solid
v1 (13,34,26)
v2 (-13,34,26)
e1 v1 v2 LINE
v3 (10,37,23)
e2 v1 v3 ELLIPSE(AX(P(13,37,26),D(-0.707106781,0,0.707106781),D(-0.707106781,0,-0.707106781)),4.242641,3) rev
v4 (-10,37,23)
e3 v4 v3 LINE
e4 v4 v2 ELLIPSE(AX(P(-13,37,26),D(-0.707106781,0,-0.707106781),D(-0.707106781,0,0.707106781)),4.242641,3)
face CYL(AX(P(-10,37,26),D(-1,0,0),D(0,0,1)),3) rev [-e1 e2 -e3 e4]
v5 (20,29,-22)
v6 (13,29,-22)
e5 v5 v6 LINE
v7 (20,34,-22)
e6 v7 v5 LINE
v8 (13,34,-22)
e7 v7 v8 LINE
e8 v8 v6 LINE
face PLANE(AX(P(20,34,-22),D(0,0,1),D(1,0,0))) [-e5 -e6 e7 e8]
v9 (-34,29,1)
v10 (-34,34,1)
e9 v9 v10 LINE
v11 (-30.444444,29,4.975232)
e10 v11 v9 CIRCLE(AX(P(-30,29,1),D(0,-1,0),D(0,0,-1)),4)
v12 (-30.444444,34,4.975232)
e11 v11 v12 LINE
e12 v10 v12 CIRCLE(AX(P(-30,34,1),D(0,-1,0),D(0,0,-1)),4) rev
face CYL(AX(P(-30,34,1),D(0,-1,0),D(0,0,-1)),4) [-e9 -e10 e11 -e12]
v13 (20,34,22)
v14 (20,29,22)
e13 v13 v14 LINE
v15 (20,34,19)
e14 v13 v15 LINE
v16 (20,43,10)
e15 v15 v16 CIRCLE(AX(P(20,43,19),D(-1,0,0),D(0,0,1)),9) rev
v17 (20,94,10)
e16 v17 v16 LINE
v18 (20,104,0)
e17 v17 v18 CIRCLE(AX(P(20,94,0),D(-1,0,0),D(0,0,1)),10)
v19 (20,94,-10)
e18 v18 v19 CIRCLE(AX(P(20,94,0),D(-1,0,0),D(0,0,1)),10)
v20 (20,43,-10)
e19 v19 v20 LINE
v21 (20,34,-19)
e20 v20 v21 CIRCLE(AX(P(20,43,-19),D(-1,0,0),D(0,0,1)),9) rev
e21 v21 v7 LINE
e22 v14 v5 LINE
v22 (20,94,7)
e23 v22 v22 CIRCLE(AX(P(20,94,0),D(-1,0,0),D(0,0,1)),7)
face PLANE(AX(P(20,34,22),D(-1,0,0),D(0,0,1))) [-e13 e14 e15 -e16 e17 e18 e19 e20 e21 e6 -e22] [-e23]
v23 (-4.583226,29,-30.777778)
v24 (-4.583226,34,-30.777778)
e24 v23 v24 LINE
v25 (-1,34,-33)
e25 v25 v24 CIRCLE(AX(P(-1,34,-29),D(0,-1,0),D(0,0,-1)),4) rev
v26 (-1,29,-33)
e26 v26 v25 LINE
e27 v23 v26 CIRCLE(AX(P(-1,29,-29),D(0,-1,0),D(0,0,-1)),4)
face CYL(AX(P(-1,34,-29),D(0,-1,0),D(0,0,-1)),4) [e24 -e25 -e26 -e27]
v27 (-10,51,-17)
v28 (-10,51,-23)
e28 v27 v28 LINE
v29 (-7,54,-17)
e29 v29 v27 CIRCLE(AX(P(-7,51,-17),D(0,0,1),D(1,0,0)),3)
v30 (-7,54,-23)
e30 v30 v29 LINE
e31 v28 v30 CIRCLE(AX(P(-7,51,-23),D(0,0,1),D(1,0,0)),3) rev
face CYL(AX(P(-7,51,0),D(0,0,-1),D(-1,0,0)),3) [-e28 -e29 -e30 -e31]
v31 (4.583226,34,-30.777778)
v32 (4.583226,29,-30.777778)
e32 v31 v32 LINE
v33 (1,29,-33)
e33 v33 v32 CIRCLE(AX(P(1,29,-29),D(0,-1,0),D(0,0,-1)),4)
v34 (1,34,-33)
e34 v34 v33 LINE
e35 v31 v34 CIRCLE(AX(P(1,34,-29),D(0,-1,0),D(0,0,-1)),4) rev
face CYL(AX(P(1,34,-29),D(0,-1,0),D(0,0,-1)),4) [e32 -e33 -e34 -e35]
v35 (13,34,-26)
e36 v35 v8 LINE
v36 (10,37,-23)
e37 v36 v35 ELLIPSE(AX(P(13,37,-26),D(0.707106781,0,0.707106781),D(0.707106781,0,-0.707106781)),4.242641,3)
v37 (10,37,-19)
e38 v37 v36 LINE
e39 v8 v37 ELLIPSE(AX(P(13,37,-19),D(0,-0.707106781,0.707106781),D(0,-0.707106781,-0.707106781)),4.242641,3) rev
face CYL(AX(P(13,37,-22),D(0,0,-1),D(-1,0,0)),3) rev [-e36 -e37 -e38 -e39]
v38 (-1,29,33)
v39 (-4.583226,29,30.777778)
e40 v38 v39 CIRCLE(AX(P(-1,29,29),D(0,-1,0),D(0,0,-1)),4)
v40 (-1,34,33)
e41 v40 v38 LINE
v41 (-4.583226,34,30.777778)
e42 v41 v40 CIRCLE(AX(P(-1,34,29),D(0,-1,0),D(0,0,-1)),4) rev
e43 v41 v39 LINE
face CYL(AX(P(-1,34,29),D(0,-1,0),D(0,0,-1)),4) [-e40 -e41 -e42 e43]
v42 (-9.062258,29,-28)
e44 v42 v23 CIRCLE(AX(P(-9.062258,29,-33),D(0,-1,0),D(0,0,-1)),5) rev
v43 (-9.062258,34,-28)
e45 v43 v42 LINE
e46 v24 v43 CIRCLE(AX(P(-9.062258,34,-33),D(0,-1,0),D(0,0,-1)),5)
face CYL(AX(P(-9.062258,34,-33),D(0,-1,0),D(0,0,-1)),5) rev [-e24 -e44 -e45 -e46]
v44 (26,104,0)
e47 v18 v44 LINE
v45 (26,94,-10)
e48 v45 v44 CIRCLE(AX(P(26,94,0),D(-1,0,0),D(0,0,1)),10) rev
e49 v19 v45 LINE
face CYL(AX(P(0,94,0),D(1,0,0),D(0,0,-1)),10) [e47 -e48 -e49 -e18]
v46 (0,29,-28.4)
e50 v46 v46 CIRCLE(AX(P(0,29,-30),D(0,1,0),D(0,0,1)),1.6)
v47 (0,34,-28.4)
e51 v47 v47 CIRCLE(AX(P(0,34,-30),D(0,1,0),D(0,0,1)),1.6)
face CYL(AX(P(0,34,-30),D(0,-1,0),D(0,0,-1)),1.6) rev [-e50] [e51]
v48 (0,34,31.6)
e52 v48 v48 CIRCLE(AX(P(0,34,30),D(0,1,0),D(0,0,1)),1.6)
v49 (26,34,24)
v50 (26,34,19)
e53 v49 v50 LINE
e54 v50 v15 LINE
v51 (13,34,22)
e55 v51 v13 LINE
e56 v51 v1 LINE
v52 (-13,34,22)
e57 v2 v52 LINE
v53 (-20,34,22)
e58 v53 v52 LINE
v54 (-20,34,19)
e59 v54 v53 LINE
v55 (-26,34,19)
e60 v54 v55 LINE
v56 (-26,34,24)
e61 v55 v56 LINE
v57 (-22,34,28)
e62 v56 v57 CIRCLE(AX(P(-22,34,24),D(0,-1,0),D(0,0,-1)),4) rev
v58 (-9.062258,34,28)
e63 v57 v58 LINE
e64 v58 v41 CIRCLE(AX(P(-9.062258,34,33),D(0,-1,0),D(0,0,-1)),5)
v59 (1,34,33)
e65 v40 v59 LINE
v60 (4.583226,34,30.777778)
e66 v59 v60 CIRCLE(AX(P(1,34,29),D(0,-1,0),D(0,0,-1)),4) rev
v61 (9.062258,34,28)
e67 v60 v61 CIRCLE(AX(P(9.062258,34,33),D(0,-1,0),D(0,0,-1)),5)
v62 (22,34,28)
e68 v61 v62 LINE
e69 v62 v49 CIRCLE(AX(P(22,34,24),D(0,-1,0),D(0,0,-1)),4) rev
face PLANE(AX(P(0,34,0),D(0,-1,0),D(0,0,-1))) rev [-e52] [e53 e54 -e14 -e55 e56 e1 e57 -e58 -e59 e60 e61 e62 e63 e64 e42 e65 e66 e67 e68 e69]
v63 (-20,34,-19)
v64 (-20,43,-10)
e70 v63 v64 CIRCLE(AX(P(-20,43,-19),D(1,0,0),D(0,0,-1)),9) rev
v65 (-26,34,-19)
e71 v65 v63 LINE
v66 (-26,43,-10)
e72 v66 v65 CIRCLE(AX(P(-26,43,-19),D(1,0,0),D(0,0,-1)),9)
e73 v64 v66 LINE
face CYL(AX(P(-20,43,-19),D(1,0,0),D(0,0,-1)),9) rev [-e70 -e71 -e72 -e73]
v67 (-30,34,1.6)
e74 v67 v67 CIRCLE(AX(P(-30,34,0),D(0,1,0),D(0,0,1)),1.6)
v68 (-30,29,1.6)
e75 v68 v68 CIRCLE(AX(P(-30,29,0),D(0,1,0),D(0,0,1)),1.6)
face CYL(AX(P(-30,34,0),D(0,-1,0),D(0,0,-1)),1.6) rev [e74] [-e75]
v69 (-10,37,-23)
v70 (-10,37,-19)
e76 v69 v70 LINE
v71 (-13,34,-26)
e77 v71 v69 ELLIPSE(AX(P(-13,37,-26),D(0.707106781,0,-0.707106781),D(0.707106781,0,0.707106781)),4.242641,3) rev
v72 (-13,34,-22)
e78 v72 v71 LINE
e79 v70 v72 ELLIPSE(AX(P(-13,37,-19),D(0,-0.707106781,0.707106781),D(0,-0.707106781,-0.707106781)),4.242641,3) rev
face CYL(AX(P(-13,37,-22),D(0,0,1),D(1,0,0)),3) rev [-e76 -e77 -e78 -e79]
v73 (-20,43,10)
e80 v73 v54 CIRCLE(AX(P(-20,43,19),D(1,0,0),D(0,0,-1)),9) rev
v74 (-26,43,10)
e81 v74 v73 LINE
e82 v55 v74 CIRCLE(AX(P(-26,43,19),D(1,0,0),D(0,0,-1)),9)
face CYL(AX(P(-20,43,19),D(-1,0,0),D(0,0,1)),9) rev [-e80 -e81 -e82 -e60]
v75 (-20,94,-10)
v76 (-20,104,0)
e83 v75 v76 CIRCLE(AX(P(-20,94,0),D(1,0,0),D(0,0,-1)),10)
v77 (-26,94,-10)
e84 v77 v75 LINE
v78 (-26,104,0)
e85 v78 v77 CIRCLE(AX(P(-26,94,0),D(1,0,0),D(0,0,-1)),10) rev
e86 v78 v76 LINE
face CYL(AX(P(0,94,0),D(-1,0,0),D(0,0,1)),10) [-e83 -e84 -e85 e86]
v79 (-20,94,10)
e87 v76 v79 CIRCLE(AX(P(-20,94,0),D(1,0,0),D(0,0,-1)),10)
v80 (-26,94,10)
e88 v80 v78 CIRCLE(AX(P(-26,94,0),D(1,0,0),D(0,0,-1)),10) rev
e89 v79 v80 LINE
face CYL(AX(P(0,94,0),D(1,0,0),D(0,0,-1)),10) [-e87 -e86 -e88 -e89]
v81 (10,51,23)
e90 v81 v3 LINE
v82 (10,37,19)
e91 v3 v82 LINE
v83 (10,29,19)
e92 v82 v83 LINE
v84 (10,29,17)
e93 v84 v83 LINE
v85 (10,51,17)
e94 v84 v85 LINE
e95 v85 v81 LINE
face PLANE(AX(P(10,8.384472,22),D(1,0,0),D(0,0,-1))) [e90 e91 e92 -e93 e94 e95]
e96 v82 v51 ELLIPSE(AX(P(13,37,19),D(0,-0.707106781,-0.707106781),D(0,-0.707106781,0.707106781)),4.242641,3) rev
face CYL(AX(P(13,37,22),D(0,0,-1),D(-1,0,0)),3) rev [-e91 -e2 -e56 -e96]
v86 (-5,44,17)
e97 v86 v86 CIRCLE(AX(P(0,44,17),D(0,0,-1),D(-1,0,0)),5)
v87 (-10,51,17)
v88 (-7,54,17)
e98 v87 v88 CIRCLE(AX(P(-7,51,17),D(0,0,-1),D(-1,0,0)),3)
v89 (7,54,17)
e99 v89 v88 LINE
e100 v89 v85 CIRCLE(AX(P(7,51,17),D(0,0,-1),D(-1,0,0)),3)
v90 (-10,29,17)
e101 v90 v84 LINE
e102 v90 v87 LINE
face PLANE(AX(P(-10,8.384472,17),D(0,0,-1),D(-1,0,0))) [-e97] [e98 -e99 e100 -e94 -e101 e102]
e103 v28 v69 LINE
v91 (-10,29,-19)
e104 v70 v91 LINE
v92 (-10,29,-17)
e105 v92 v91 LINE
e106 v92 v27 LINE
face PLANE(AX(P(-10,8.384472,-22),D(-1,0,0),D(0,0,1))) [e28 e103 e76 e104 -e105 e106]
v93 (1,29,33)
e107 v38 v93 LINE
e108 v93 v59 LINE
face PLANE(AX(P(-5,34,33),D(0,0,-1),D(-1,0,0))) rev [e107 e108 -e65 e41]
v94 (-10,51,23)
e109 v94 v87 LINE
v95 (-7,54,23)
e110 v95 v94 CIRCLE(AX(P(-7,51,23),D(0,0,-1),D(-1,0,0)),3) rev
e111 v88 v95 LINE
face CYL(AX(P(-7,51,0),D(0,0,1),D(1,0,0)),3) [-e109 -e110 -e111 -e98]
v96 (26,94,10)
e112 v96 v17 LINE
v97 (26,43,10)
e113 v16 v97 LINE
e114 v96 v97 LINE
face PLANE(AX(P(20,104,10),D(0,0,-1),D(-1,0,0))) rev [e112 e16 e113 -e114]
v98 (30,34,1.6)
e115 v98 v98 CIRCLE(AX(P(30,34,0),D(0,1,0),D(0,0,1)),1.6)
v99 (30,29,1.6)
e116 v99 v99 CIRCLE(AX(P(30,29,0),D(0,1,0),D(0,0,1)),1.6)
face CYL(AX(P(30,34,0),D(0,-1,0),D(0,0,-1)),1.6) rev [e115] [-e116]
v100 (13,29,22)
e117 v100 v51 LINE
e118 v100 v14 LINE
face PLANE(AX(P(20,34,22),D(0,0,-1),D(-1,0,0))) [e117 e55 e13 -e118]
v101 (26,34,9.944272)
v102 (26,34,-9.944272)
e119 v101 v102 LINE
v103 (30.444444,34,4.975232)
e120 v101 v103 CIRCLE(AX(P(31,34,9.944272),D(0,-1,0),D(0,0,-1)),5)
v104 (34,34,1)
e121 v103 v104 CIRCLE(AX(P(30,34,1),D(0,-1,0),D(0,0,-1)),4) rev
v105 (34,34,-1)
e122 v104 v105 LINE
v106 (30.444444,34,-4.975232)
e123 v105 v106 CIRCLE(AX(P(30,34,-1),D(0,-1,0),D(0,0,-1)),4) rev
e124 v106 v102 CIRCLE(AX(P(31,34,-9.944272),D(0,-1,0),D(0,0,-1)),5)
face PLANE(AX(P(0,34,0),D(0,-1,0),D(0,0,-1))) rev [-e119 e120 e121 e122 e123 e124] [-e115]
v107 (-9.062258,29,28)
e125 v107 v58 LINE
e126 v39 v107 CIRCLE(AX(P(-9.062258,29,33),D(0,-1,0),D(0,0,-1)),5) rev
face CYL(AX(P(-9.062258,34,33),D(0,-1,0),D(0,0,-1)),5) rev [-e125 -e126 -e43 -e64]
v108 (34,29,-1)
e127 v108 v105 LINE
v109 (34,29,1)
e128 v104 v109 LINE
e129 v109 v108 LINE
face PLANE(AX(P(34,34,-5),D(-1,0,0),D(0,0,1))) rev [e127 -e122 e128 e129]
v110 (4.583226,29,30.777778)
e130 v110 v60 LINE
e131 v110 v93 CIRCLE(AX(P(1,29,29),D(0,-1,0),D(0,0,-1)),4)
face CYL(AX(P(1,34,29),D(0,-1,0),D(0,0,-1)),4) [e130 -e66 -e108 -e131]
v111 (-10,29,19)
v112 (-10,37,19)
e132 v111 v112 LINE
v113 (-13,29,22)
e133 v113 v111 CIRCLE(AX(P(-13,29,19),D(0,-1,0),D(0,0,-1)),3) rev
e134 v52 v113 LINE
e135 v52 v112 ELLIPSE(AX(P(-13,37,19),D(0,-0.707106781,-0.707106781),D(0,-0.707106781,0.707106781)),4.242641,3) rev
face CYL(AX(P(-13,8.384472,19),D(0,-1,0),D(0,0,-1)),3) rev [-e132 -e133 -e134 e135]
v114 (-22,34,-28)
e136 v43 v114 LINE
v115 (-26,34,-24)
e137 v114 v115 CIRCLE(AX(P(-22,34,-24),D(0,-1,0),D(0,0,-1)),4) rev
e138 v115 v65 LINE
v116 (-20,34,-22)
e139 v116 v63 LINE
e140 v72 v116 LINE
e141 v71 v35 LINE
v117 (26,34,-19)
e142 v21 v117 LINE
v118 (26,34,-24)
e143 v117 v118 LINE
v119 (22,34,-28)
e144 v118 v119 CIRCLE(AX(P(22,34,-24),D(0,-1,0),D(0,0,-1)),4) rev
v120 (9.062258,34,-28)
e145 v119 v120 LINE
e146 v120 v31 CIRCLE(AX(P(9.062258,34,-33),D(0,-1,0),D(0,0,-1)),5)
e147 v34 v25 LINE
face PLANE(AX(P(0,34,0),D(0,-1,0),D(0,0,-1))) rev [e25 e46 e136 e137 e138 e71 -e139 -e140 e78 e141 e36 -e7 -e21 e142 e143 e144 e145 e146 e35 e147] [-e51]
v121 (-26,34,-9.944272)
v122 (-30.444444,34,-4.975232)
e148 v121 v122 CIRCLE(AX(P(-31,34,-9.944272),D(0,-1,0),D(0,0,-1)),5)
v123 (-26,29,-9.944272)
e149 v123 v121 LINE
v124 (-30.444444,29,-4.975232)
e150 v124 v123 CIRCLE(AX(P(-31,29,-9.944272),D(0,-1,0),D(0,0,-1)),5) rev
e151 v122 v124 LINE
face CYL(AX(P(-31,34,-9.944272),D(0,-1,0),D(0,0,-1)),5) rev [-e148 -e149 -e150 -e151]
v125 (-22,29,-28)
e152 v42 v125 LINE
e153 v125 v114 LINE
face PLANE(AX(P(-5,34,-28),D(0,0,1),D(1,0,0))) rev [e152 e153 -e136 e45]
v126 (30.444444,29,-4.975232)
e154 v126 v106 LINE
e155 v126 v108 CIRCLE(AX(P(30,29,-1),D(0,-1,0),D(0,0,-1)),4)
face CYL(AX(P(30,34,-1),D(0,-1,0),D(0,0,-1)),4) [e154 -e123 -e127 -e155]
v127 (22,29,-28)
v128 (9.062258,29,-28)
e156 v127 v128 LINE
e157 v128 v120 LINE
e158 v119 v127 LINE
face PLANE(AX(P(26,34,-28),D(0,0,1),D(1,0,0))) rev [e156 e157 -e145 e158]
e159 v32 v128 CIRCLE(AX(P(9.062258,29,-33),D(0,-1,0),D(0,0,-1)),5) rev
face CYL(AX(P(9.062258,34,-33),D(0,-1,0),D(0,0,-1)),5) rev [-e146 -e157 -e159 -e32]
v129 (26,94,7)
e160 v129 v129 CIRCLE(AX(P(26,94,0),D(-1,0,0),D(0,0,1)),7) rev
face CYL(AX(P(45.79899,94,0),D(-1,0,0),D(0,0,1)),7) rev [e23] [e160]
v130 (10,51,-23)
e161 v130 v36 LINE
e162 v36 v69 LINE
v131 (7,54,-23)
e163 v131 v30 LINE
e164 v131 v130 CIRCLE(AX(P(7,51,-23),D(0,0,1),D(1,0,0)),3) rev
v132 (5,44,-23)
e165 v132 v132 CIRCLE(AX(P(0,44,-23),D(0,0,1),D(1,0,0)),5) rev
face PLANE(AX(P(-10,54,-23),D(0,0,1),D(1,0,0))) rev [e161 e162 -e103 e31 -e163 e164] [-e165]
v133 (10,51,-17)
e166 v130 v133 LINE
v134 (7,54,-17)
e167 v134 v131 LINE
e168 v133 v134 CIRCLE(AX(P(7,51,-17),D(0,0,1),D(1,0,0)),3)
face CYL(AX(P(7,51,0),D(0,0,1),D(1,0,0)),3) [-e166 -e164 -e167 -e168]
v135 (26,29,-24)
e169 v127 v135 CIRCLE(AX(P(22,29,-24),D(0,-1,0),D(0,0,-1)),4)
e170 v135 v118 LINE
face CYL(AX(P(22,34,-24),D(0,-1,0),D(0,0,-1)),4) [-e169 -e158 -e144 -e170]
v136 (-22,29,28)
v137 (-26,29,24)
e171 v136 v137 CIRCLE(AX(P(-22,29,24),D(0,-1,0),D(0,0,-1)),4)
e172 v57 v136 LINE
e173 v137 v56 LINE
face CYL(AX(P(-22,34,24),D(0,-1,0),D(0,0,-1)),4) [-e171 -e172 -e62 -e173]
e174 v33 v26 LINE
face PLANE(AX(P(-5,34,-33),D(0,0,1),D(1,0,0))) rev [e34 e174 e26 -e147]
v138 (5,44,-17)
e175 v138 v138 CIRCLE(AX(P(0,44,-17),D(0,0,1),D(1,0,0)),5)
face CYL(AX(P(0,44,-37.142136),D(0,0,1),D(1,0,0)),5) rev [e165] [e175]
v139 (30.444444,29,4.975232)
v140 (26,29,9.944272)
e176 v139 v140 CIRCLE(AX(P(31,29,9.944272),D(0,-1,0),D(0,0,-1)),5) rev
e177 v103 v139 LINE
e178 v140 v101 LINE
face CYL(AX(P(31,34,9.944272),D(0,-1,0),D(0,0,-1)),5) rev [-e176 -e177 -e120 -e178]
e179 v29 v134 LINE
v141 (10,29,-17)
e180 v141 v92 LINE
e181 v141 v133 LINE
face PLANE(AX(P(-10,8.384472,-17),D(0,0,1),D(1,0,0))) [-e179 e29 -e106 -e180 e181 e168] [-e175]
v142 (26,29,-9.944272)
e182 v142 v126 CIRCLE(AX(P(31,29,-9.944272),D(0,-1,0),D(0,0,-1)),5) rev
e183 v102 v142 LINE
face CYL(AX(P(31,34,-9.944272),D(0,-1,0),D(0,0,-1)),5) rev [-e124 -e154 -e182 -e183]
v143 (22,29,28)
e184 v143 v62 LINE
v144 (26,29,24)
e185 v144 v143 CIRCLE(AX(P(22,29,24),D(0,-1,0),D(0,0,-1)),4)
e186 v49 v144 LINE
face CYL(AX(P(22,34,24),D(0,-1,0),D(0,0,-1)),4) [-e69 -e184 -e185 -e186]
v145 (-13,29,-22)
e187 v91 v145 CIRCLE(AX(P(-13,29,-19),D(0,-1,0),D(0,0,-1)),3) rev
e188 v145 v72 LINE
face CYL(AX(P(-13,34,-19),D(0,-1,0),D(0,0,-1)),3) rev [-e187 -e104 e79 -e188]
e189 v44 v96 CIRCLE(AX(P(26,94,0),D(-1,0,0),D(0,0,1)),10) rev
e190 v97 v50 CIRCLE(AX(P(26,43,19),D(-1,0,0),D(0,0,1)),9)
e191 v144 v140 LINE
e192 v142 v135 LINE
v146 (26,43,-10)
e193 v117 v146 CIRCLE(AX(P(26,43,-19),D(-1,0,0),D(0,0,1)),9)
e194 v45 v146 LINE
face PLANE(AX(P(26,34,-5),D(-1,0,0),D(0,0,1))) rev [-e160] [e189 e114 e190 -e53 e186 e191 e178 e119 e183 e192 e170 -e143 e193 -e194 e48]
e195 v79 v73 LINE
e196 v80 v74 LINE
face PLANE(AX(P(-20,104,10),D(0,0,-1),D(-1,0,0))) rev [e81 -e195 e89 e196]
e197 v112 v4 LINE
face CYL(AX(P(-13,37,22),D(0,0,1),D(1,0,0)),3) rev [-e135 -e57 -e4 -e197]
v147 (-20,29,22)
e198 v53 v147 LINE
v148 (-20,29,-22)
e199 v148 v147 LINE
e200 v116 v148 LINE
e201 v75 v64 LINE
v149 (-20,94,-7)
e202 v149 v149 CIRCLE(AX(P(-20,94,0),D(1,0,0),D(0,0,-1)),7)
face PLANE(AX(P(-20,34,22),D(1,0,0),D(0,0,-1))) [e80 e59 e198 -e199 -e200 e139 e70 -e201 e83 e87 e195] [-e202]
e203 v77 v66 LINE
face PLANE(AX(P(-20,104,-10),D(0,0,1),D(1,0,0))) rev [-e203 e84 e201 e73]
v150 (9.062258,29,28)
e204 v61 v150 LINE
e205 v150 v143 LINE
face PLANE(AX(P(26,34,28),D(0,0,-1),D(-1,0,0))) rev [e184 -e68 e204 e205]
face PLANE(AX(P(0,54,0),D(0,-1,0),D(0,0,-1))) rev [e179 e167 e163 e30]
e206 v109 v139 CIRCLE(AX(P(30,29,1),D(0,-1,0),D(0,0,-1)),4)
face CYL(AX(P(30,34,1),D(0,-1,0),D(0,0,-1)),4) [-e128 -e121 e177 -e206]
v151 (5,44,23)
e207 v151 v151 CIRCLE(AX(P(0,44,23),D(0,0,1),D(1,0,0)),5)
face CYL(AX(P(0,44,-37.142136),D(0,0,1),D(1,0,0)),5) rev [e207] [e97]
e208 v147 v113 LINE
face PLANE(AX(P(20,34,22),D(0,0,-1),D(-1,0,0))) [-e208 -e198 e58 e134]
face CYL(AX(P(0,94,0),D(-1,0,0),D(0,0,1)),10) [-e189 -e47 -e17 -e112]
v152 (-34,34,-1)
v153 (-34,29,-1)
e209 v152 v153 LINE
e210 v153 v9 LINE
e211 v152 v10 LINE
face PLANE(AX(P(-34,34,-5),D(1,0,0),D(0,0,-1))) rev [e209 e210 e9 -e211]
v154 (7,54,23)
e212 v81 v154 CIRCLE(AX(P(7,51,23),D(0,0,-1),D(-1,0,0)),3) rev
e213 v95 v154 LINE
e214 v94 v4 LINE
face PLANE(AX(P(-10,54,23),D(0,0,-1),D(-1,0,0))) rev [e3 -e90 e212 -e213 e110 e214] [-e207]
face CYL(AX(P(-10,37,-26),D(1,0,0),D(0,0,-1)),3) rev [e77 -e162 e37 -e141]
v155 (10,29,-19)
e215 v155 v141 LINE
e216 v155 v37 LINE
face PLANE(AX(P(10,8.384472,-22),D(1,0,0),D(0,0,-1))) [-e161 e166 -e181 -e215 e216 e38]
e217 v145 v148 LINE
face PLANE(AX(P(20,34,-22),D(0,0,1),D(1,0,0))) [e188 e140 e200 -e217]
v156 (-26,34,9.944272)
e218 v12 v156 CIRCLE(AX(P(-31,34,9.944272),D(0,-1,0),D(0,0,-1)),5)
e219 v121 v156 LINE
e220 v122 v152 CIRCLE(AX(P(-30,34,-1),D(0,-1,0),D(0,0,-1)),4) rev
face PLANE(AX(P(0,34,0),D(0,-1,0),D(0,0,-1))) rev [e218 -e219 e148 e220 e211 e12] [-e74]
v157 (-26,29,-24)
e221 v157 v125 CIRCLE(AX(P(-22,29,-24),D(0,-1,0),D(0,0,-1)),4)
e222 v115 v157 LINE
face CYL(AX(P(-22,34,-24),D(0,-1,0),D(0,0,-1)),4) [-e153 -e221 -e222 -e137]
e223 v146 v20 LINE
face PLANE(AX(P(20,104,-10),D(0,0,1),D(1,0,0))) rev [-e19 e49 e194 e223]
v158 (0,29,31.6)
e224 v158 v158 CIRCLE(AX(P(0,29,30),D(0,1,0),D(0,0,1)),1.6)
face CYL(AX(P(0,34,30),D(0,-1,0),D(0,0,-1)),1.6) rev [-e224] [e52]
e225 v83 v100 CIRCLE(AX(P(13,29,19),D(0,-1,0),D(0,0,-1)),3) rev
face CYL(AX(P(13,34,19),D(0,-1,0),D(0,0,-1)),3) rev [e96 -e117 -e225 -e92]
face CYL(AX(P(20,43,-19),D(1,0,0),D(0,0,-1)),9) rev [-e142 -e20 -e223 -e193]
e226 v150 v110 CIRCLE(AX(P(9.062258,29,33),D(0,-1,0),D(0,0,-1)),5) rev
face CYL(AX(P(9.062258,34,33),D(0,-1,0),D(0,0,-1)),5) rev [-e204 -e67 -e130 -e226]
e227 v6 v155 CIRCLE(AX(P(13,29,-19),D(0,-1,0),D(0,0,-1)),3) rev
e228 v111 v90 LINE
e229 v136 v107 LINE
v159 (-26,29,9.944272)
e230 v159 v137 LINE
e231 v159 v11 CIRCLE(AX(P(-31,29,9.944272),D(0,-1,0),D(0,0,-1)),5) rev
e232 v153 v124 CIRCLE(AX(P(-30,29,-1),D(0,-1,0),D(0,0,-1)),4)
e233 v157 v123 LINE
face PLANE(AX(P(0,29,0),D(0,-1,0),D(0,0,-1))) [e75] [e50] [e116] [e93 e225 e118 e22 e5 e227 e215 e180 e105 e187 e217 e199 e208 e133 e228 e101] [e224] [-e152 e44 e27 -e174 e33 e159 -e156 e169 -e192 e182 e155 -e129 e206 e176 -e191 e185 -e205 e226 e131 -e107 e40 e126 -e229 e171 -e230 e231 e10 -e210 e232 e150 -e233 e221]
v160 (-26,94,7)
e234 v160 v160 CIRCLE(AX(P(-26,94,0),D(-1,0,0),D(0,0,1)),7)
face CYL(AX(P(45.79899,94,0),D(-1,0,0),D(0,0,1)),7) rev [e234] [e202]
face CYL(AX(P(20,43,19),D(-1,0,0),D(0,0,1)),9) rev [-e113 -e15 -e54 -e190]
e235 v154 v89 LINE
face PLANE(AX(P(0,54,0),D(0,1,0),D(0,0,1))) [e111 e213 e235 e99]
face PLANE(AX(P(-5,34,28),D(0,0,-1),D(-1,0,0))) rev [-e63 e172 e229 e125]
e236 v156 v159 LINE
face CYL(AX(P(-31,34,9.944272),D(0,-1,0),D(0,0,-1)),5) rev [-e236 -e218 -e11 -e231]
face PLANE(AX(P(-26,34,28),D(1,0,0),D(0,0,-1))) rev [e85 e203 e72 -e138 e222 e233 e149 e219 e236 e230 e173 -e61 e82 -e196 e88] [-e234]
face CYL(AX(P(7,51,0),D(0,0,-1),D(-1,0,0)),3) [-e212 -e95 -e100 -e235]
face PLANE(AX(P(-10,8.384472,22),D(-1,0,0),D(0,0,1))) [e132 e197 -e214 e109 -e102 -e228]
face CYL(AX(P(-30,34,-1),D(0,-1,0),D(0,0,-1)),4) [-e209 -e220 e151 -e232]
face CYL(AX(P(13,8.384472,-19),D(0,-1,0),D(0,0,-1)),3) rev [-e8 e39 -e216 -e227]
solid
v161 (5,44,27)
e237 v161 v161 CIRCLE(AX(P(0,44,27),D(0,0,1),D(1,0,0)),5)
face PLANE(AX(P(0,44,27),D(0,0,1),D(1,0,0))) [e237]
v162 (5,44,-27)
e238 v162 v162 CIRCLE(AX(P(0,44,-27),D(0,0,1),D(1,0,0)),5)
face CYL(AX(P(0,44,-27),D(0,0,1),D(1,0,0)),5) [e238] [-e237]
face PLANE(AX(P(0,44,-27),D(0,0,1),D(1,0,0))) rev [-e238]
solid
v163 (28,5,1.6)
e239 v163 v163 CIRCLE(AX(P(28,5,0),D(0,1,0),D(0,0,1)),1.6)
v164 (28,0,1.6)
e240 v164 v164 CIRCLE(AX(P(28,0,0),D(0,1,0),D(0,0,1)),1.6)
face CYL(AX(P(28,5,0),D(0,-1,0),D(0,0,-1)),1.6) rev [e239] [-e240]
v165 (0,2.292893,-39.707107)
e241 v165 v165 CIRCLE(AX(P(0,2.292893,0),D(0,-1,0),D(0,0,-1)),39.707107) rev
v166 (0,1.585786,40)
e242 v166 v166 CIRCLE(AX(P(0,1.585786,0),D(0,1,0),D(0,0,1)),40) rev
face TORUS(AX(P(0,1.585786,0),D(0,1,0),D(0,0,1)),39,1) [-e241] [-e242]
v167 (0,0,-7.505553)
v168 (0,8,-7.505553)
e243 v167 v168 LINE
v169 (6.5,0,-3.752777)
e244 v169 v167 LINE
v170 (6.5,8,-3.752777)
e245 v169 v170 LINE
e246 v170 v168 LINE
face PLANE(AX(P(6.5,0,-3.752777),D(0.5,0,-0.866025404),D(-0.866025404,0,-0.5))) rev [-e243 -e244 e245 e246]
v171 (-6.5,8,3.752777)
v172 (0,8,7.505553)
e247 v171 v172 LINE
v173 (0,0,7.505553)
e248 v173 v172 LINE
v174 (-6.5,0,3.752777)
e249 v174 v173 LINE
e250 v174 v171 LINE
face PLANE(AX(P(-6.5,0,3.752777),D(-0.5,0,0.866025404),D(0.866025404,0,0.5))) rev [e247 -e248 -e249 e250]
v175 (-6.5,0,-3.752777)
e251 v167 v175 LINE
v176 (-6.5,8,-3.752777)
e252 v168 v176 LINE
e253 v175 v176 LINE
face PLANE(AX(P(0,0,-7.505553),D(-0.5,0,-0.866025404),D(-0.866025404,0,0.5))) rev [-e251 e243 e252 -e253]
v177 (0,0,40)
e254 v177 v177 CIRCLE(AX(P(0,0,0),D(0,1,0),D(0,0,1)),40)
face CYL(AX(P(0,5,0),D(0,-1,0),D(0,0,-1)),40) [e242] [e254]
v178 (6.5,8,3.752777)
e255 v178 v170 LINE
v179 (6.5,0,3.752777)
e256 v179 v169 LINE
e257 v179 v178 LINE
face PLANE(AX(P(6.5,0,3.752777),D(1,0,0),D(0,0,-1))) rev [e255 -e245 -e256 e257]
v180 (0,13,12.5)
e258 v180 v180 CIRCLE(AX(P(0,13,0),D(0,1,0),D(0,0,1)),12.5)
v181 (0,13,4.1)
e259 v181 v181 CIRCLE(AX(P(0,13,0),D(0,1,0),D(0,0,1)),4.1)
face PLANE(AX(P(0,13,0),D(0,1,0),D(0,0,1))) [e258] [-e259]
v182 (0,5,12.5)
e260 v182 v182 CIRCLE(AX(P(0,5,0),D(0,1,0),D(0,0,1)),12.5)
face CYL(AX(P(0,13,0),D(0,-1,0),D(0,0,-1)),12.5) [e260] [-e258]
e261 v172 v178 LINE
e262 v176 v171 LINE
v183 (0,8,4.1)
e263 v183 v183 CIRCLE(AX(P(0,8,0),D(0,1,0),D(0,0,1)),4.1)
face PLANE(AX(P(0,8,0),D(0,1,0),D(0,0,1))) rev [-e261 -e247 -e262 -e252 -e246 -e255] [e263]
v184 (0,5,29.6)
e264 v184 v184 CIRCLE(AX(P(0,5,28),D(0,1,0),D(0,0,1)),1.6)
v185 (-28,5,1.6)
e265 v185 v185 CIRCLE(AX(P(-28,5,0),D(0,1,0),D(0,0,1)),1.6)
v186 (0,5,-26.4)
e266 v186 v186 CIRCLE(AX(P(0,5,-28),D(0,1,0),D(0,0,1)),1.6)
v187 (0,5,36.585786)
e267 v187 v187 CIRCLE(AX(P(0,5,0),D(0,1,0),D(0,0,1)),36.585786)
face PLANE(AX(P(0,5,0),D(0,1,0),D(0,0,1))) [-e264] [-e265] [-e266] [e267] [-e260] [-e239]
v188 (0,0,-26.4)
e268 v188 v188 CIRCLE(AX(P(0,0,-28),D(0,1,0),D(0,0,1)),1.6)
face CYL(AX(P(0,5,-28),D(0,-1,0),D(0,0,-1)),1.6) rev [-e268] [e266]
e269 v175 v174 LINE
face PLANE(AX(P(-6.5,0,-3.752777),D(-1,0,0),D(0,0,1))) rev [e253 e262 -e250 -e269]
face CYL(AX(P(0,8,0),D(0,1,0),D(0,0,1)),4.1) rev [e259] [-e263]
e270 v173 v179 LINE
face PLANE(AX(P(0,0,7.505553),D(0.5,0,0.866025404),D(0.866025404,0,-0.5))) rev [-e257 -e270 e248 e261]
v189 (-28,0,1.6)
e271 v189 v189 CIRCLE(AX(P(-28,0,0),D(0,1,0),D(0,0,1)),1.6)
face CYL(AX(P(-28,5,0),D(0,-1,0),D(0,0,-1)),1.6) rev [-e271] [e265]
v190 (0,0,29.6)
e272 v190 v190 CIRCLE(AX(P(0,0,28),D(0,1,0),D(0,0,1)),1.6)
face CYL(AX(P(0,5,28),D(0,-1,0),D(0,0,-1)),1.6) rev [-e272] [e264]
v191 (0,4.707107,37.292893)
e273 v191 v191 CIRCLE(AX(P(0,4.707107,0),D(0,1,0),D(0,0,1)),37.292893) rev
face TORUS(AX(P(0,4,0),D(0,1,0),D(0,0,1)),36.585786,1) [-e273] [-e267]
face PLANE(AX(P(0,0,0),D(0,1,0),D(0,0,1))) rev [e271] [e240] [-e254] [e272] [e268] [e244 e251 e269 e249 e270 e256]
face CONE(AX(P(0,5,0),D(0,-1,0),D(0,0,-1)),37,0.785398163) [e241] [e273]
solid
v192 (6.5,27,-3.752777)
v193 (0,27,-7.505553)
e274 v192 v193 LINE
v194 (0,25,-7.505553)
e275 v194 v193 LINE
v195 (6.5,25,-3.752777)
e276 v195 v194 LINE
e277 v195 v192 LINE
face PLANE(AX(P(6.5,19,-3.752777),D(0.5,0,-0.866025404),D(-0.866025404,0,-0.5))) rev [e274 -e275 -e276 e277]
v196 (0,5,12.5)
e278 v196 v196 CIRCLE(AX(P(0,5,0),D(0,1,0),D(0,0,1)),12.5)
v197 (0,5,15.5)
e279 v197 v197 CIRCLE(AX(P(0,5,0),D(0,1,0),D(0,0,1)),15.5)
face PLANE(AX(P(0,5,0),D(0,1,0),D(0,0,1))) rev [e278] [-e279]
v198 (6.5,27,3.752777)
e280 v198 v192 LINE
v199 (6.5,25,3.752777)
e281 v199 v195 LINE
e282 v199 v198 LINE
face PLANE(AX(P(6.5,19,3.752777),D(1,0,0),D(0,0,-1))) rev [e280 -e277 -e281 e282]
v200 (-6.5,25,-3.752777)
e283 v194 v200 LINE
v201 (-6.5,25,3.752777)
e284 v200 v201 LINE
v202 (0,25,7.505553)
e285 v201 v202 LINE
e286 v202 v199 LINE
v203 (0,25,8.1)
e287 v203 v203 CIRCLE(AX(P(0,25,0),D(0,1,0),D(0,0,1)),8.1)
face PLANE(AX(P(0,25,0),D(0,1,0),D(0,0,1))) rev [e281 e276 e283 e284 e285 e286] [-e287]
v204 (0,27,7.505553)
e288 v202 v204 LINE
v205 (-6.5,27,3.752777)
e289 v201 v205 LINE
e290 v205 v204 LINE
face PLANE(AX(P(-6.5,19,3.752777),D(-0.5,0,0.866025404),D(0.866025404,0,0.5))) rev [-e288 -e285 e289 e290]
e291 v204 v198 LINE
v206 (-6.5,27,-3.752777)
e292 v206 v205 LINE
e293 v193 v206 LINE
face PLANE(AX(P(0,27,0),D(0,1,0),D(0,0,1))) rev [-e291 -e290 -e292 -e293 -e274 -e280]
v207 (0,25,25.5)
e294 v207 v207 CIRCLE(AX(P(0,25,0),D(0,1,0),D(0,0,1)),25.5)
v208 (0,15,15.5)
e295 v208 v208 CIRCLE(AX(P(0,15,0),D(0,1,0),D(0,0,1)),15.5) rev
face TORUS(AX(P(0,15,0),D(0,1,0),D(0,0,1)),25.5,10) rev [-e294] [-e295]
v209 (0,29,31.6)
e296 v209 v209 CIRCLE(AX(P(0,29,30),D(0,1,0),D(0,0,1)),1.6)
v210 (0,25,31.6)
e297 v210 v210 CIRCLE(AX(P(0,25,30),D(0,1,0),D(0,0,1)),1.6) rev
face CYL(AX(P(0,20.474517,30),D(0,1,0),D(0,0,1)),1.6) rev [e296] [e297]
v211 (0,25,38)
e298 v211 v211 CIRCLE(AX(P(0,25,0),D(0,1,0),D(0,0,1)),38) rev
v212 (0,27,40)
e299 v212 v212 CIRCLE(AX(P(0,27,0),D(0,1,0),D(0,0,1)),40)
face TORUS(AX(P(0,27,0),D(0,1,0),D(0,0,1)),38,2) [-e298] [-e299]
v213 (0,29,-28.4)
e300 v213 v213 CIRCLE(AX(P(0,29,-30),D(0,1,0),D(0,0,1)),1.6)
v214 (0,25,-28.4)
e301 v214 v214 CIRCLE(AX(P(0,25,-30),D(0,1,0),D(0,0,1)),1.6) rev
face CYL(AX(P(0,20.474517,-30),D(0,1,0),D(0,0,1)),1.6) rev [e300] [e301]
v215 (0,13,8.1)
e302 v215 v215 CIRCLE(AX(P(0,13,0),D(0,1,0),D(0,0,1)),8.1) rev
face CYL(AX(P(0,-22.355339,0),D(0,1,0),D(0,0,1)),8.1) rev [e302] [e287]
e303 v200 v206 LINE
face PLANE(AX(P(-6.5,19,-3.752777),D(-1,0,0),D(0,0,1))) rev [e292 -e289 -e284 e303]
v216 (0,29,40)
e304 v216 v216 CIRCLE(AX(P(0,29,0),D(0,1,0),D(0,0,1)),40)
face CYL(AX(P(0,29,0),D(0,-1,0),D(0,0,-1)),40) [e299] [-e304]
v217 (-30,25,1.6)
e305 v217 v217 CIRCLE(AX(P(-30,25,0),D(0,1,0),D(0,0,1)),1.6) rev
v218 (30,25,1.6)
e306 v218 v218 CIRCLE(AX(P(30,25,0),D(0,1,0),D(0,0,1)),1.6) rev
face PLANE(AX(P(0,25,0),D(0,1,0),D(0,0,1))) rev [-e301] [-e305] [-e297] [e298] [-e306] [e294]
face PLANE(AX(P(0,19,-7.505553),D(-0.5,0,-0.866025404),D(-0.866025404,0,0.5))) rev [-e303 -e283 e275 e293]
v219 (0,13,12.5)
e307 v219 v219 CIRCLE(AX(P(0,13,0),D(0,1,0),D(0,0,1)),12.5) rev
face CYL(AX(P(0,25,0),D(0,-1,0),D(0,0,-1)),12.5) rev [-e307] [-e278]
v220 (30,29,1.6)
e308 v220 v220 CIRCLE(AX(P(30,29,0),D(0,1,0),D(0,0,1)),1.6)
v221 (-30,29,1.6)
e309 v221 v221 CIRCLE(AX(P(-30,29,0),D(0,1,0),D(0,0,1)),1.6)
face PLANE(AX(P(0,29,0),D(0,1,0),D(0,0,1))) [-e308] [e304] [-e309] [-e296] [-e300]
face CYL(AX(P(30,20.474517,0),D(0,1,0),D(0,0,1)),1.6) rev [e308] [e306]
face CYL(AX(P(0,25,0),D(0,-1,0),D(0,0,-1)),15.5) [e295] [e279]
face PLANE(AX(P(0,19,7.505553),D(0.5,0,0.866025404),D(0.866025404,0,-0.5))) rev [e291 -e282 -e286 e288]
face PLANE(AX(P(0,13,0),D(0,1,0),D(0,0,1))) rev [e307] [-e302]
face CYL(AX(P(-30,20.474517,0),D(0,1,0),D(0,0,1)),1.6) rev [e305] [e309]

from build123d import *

# Parameters (mm, degrees)
CROQUIS1_R               = 40
CROQUIS1_R_2             = 1.6
SALIENTE_EXTRUIR1_DEPTH  = 5
CHAFL_N1_SIZE            = 3
REDONDEO1_R              = 1
CORTAR_EXTRUIR1_DEPTH    = 5
SALIENTE_EXTRUIR3_DEPTH  = 8
CROQUIS6_R               = 4.1
SALIENTE_EXTRUIR4_DEPTH  = 5
CROQUIS7_R               = 12.5
SALIENTE_EXTRUIR5_DEPTH  = 8
CROQUIS9_R               = 15.5
CROQUIS9_R_2             = 12.5
SALIENTE_EXTRUIR7_DEPTH  = 20
SALIENTE_EXTRUIR8_START  = -12
CROQUIS10_R              = 12.5
CROQUIS10_R_2            = 8.1
SALIENTE_EXTRUIR8_DEPTH  = 12
CROQUIS11_R              = 40
SALIENTE_EXTRUIR9_DEPTH  = 4
REDONDEO2_R              = 10
CORTAR_EXTRUIR2_DEPTH    = 10
SALIENTE_EXTRUIR10_DEPTH = 2
REDONDEO3_R              = 2
CROQUIS14_R              = 1.6
CORTAR_EXTRUIR3_DEPTH    = 4
CROQUIS15_R              = 1.6
CROQUIS15_W              = 40
CROQUIS15_H              = 44
SALIENTE_EXTRUIR11_DEPTH = 5
REDONDEO4_R              = 4
CROQUIS16_W              = 6
CROQUIS16_H              = 20
SALIENTE_EXTRUIR12_DEPTH = 70
REDONDEO5_R              = 10
CORTAR_EXTRUIR4_REACH    = 131.507
CROQUIS18_R              = 7
REDONDEO6_R              = 9
REDONDEO7_R              = 5
CROQUIS19_W              = 20
CROQUIS19_H              = 5
SALIENTE_EXTRUIR13_DEPTH = 5
CROQUIS20_W              = 20
CROQUIS20_H              = 6
SALIENTE_EXTRUIR14_DEPTH = 20
CORTAR_EXTRUIR5_REACH    = 130.004
CROQUIS21_R              = 5
REDONDEO9_R              = 3
REDONDEO10_R             = 3
CROQUIS22_R              = 5
SALIENTE_EXTRUIR15_DEPTH = 50
CROQUIS23_R              = 5
SALIENTE_EXTRUIR16_DEPTH = 4


# Some blends are built 0.0001 mm under size
with BuildPart() as part:
    # Croquis1 → Saliente-Extruir1 (new body)
    with BuildSketch(Plane(origin=(0, 0, 0), x_dir=(1, 0, 0), z_dir=(0, 1, 0))):
        with Locations(Location((0, 0, 0), (0, 0, 270))):
            Circle(CROQUIS1_R)
        with Locations(Location((0, 28, 0), (0, 0, 270))):
            Circle(CROQUIS1_R_2, mode=Mode.SUBTRACT)
        with Locations(Location((28, 0, 0), (0, 0, 270))):
            Circle(CROQUIS1_R_2, mode=Mode.SUBTRACT)
        with Locations(Location((0, -28, 0), (0, 0, 270))):
            Circle(CROQUIS1_R_2, mode=Mode.SUBTRACT)
        with Locations(Location((-28, 0, 0), (0, 0, 270))):
            Circle(CROQUIS1_R_2, mode=Mode.SUBTRACT)
    extrude(amount=SALIENTE_EXTRUIR1_DEPTH)

    # Chaflán1
    chafl_n1_edges = [part.edges().sort_by_distance(p)[0] for p in [
        (0, 5, -40),
    ]]
    chamfer(chafl_n1_edges, length=CHAFL_N1_SIZE)

    # Redondeo1
    redondeo1_edges = [part.edges().sort_by_distance(p)[0] for p in [
        (0, 5, -37),
        (0, 2, -40),
    ]]
    fillet(redondeo1_edges, radius=REDONDEO1_R)

    # Croquis4 → Cortar-Extruir1 (cut)
    with BuildSketch(Plane(origin=(0, 5, 0), x_dir=(1, 0, 0), z_dir=(0, 1, 0))):
        Polygon((0, 7.505553499), (-6.5, 3.75277675), (-6.5, -3.75277675), (0, -7.505553499), (6.5, -3.75277675), (6.5, 3.75277675), align=None)
    extrude(amount=-CORTAR_EXTRUIR1_DEPTH, mode=Mode.SUBTRACT)

    # Croquis5 → Saliente-Extruir3 (add)
    with BuildSketch(Plane(origin=(0, 5, 0), x_dir=(1, 0, 0), z_dir=(0, 1, 0))):
        Polygon((0, 10.969655115), (-9.5, 5.484827557), (-9.5, -5.484827557), (0, -10.969655115), (9.5, -5.484827557), (9.5, 5.484827557), align=None)
        Polygon((0, 7.505553499), (-6.5, 3.75277675), (-6.5, -3.75277675), (0, -7.505553499), (6.5, -3.75277675), (6.5, 3.75277675), align=None, mode=Mode.SUBTRACT)
    extrude(amount=SALIENTE_EXTRUIR3_DEPTH)

    # Croquis6 → Saliente-Extruir4 (add)
    with BuildSketch(Plane(origin=(0, 13, 0), x_dir=(1, 0, 0), z_dir=(0, 1, 0))):
        Polygon((0, 7.505553499), (-6.5, 3.75277675), (-6.5, -3.75277675), (0, -7.505553499), (6.5, -3.75277675), (6.5, 3.75277675), align=None)
        with Locations(Location((0, 0, 0), (0, 0, 270))):
            Circle(CROQUIS6_R, mode=Mode.SUBTRACT)
    extrude(amount=-SALIENTE_EXTRUIR4_DEPTH)

    # Croquis7 → Saliente-Extruir5 (add)
    with BuildSketch(Plane(origin=(0, 5, 0), x_dir=(1, 0, 0), z_dir=(0, 1, 0))):
        with Locations(Location((0, 0, 0), (0, 0, 270))):
            Circle(CROQUIS7_R)
        Polygon((9.5, 5.484827557), (0, 10.969655115), (-9.5, 5.484827557), (-9.5, -5.484827557), (0, -10.969655115), (9.5, -5.484827557), align=None, mode=Mode.SUBTRACT)
    extrude(amount=SALIENTE_EXTRUIR5_DEPTH)


with BuildPart() as body_2:
    # Croquis9 → Saliente-Extruir7 (new body)
    with BuildSketch(Plane(origin=(0, 5, 0), x_dir=(1, 0, 0), z_dir=(0, 1, 0))):
        with Locations(Location((0, 0, 0), (0, 0, 270))):
            Circle(CROQUIS9_R)
        with Locations(Location((0, 0, 0), (0, 0, 270))):
            Circle(CROQUIS9_R_2, mode=Mode.SUBTRACT)
    extrude(amount=SALIENTE_EXTRUIR7_DEPTH)

    # Croquis10 → Saliente-Extruir8 (add)
    with BuildSketch(Plane(origin=(0, 25, 0), x_dir=(1, 0, 0), z_dir=(0, 1, 0)).offset(SALIENTE_EXTRUIR8_START)):
        with Locations(Location((0, 0, 0), (0, 0, 270))):
            Circle(CROQUIS10_R)
        with Locations(Location((0, 0, 0), (0, 0, 270))):
            Circle(CROQUIS10_R_2, mode=Mode.SUBTRACT)
    extrude(amount=SALIENTE_EXTRUIR8_DEPTH)

    # Croquis11 → Saliente-Extruir9 (add)
    with BuildSketch(Plane(origin=(0, 25, 0), x_dir=(1, 0, 0), z_dir=(0, 1, 0))):
        with Locations(Location((0, 0, 0), (0, 0, 270))):
            Circle(CROQUIS11_R)
    extrude(amount=SALIENTE_EXTRUIR9_DEPTH)

    # Redondeo2
    redondeo2_edges = [body_2.edges().sort_by_distance(p)[0] for p in [
        (0, 25, -15.5),
    ]]
    fillet(redondeo2_edges, radius=REDONDEO2_R)

    # Croquis12 → Cortar-Extruir2 (cut)
    with BuildSketch(Plane(origin=(0, 29, 0), x_dir=(1, 0, 0), z_dir=(0, 1, 0))):
        Polygon((0, 7.505553499), (-6.5, 3.75277675), (-6.5, -3.75277675), (0, -7.505553499), (6.5, -3.75277675), (6.5, 3.75277675), align=None)
    extrude(amount=-CORTAR_EXTRUIR2_DEPTH, mode=Mode.SUBTRACT)

    # Croquis13 → Saliente-Extruir10 (add)
    with BuildSketch(Plane(origin=(0, 29, 0), x_dir=(1, 0, 0), z_dir=(0, 1, 0))):
        Polygon((-6.5, 3.75277675), (-6.5, -3.75277675), (0, -7.505553499), (6.5, -3.75277675), (6.5, 3.75277675), (0, 7.505553499), align=None)
    extrude(amount=-SALIENTE_EXTRUIR10_DEPTH)

    # Redondeo3
    redondeo3_edges = [body_2.edges().sort_by_distance(p)[0] for p in [
        (0, 25, -40),
    ]]
    fillet(redondeo3_edges, radius=REDONDEO3_R)

    # Croquis14 → Cortar-Extruir3 (cut)
    with BuildSketch(Plane(origin=(0, 29, 0), x_dir=(1, 0, 0), z_dir=(0, 1, 0))):
        with Locations(Location((0, 30, 0), (0, 0, 270))):
            Circle(CROQUIS14_R)
        with Locations(Location((30, 0, 0), (0, 0, 270))):
            Circle(CROQUIS14_R)
        with Locations(Location((0, -30, 0), (0, 0, 270))):
            Circle(CROQUIS14_R)
        with Locations(Location((-30, 0, 0), (0, 0, 270))):
            Circle(CROQUIS14_R)
    extrude(amount=-CORTAR_EXTRUIR3_DEPTH, mode=Mode.SUBTRACT)


with BuildPart() as body_3:
    # Croquis15 → Saliente-Extruir11 (new body)
    with BuildSketch(Plane(origin=(0, 29, 0), x_dir=(1, 0, 0), z_dir=(0, 1, 0))):
        Polygon((26, -28), (5, -28), (5, -33), (-5, -33), (-5, -28), (-26, -28), (-26, -5), (-34, -5), (-34, 5), (-26, 5), (-26, 28), (-5, 28), (-5, 33), (5, 33), (5, 28), (26, 28), (26, 5), (34, 5), (34, -5), (26, -5), align=None)
        with Locations(Location((0, -30, 0), (0, 0, 270))):
            Circle(CROQUIS15_R, mode=Mode.SUBTRACT)
        with Locations(Location((30, 0, 0), (0, 0, 270))):
            Circle(CROQUIS15_R, mode=Mode.SUBTRACT)
        with Locations(Location((0, 30, 0), (0, 0, 270))):
            Circle(CROQUIS15_R, mode=Mode.SUBTRACT)
        with Locations(Location((-30, 0, 0), (0, 0, 270))):
            Circle(CROQUIS15_R, mode=Mode.SUBTRACT)
        Rectangle(CROQUIS15_W, CROQUIS15_H, mode=Mode.SUBTRACT)
    extrude(amount=SALIENTE_EXTRUIR11_DEPTH)

    # Redondeo4
    redondeo4_edges = [body_3.edges().sort_by_distance(p)[0] for p in [
        (-5, 31.5, -33),
        (5, 31.5, -33),
        (26, 31.5, -28),
        (34, 31.5, -5),
        (34, 31.5, 5),
        (26, 31.5, 28),
        (5, 31.5, 33),
        (-5, 31.5, 33),
        (-26, 31.5, 28),
        (-34, 31.5, 5),
        (-34, 31.5, -5),
        (-26, 31.5, -28),
    ]]
    fillet(redondeo4_edges, radius=REDONDEO4_R)

    # Croquis16 → Saliente-Extruir12 (add)
    with BuildSketch(Plane(origin=(0, 34, 0), x_dir=(1, 0, 0), z_dir=(0, 1, 0))):
        with Locations((-23, 0)):
            Rectangle(CROQUIS16_W, CROQUIS16_H)
        with Locations((23, 0)):
            Rectangle(CROQUIS16_W, CROQUIS16_H)
    extrude(amount=SALIENTE_EXTRUIR12_DEPTH)

    # Redondeo5
    redondeo5_edges = [body_3.edges().sort_by_distance(p)[0] for p in [
        (23, 104, -10),
        (23, 104, 10),
        (-23, 104, -10),
        (-23, 104, 10),
    ]]
    fillet(redondeo5_edges, radius=REDONDEO5_R - 0.0001)  # a hair under: the kernel refuses the full size

    # Cortar-Extruir4: up to this face of the body (flat: up to its plane)
    cortar_extruir4_end = Plane(body_3.part.faces().sort_by_distance((26, 63.485538795, 0))[0])
    # Croquis18 → Cortar-Extruir4 (cut, up to the picked face)
    with BuildSketch(Plane.ZY.offset(26), mode=Mode.PRIVATE) as cortar_extruir4_sk1:
        with Locations((0, 94)):
            Circle(CROQUIS18_R)
    cortar_extruir4_tool1 = split(extrude(cortar_extruir4_sk1.sketch, amount=-CORTAR_EXTRUIR4_REACH, mode=Mode.PRIVATE), bisect_by=cortar_extruir4_end, keep=Keep.BOTH, mode=Mode.PRIVATE)
    add(cortar_extruir4_tool1.solids().sort_by(Axis((-26, 94, 0), (1, 0, 0)))[0], mode=Mode.SUBTRACT)

    # Redondeo6
    redondeo6_edges = [body_3.edges().sort_by_distance(p)[0] for p in [
        (-23, 34, -10),
        (-23, 34, 10),
        (23, 34, 10),
        (23, 34, -10),
    ]]
    fillet(redondeo6_edges, radius=REDONDEO6_R)

    # Redondeo7
    # the kernel refuses this fillet: 5 mm, written as the material it adds along each edge
    with BuildSketch(Plane(origin=(5, 29, -28), x_dir=(1, 0, 0), z_dir=(0, 1, 0))) as redondeo7_piece_1:
        with BuildLine():
            CenterArc((4.062257748, 5), REDONDEO7_R, 206.387799961, 63.612200039)
            Line((-0.416774334, 2.777777778), (-0.864677542, 2.555555556))
            ThreePointArc((-0.864677542, 2.555555556), (-0.5, 1), (-0.5, 0))
            Line((-0.5, 0), (0, -0.5))
            Line((0, -0.5), (4.062257748, -0.5))
            Line((4.062257748, -0.5), (4.062257748, 0))
        make_face()
    extrude(amount=5)
    with BuildSketch(Plane(origin=(-5, 29, -28), x_dir=(0.14837794057356674, 0, -0.9889307289952856), z_dir=(0, 1, 0))) as redondeo7_piece_2:
        with BuildLine():
            CenterArc((4.341904206, 4.759181219), REDONDEO7_R, 188.532937529, 63.612200039)
            Line((-0.602749439, 4.017291516), (-1.097214803, 3.943102546))
            Line((-1.097214803, 3.943102546), (-0.494465364, -0.07418897))
            Line((-0.494465364, -0.07418897), (0.07418897, -0.494465364))
            ThreePointArc((0.07418897, -0.494465364), (1.063119699, -0.346087424), (2.655566492, -0.475918122))
            Line((2.655566492, -0.475918122), (2.80886992, 0))
        make_face()
    extrude(amount=5)
    with BuildSketch(Plane(origin=(-26, 29, -5), x_dir=(0, 0, -1), z_dir=(0, 1, 0)), Plane(origin=(26, 29, 5), x_dir=(0, 0, 1), z_dir=(0, 1, 0))) as redondeo7_piece_3:
        with BuildLine():
            CenterArc((4.94427191, 5), REDONDEO7_R, 186.379370208, 83.620629792)
            Line((-0.02476804, 4.444444444), (-0.521672035, 4.388888889))
            ThreePointArc((-0.521672035, 4.388888889), (-0.5, 4), (-0.5, 0))
            Line((-0.5, 0), (0, -0.5))
            Line((0, -0.5), (4.94427191, -0.5))
            Line((4.94427191, -0.5), (4.94427191, 0))
        make_face()
    extrude(amount=5)
    with BuildSketch(Plane(origin=(-26, 29, 5), x_dir=(0, 0, 1), z_dir=(0, 1, 0)), Plane(origin=(26, 29, -5), x_dir=(0, 0, -1), z_dir=(0, 1, 0))) as redondeo7_piece_4:
        with BuildLine():
            CenterArc((4.94427191, -5), REDONDEO7_R, 90, 83.620629792)
            Line((-0.02476804, -4.444444444), (-0.521672035, -4.388888889))
            ThreePointArc((-0.521672035, -4.388888889), (-0.5, -4), (-0.5, 0))
            Line((-0.5, 0), (0, 0.5))
            Line((0, 0.5), (4.94427191, 0.5))
            Line((4.94427191, 0.5), (4.94427191, 0))
        make_face()
    extrude(amount=5)
    with BuildSketch(Plane(origin=(-5, 29, 28), x_dir=(0.14837794057356815, 0, 0.9889307289952854), z_dir=(0, 1, 0))) as redondeo7_piece_5:
        with BuildLine():
            CenterArc((4.341904206, -4.759181219), REDONDEO7_R, 107.854862432, 63.612200039)
            Line((-0.602749439, -4.017291516), (-1.097214803, -3.943102546))
            Line((-1.097214803, -3.943102546), (-0.494465364, 0.07418897))
            Line((-0.494465364, 0.07418897), (0.07418897, 0.494465364))
            ThreePointArc((0.07418897, 0.494465364), (1.063119699, 0.346087424), (2.655566492, 0.475918122))
            Line((2.655566492, 0.475918122), (2.80886992, 0))
        make_face()
    extrude(amount=5)
    with BuildSketch(Plane(origin=(5, 29, 28), x_dir=(1, 0, 0), z_dir=(0, 1, 0))) as redondeo7_piece_6:
        with BuildLine():
            CenterArc((4.062257748, -5), REDONDEO7_R, 90, 63.612200039)
            Line((-0.416774334, -2.777777778), (-0.864677542, -2.555555556))
            ThreePointArc((-0.864677542, -2.555555556), (-0.5, -1), (-0.5, 0))
            Line((-0.5, 0), (0, 0.5))
            Line((0, 0.5), (4.062257748, 0.5))
            Line((4.062257748, 0.5), (4.062257748, 0))
        make_face()
    extrude(amount=5)

    # Croquis19 → Saliente-Extruir13 (add)
    with BuildSketch(Plane(origin=(0, 34, 0), x_dir=(1, 0, 0), z_dir=(0, 1, 0))):
        with Locations((0, -19.5)):
            Rectangle(CROQUIS19_W, CROQUIS19_H)
        with Locations((0, 19.5)):
            Rectangle(CROQUIS19_W, CROQUIS19_H)
    extrude(amount=-SALIENTE_EXTRUIR13_DEPTH)

    # Croquis20 → Saliente-Extruir14 (add)
    with BuildSketch(Plane(origin=(0, 34, 0), x_dir=(1, 0, 0), z_dir=(0, 1, 0))):
        with Locations((0, 20)):
            Rectangle(CROQUIS20_W, CROQUIS20_H)
        with Locations((0, -20)):
            Rectangle(CROQUIS20_W, CROQUIS20_H)
    extrude(amount=SALIENTE_EXTRUIR14_DEPTH)

    # Cortar-Extruir5: up to this face of the body (flat: up to its plane)
    cortar_extruir5_end = Plane(body_3.part.faces().sort_by_distance((0, 44, -23))[0])
    # Croquis21 → Cortar-Extruir5 (cut, up to the picked face)
    with BuildSketch(Plane.XY.offset(23), mode=Mode.PRIVATE) as cortar_extruir5_sk1:
        with Locations((0, 44)):
            Circle(CROQUIS21_R)
    cortar_extruir5_tool1 = split(extrude(cortar_extruir5_sk1.sketch, amount=-CORTAR_EXTRUIR5_REACH, mode=Mode.PRIVATE), bisect_by=cortar_extruir5_end, keep=Keep.BOTH, mode=Mode.PRIVATE)
    add(cortar_extruir5_tool1.solids().sort_by(Axis((0, 44, 23), (0, 0, -1)))[0], mode=Mode.SUBTRACT)

    # Redondeo9
    redondeo9_edges = [body_3.edges().sort_by_distance(p)[0] for p in [
        (-10, 31.5, 22),
        (10, 31.5, 22),
        (-10, 31.5, -22),
        (10, 31.5, -22),
        (0, 34, -23),
        (-10, 54, -20),
        (10, 54, -20),
        (0, 34, 23),
        (-10, 54, 20),
        (10, 54, 20),
    ]]
    fillet(redondeo9_edges, radius=REDONDEO9_R)

    # Redondeo10
    redondeo10_edges = [body_3.edges().sort_by_distance(p)[0] for p in [
        (-10, 34, 22.5),
        (10, 34, 22.5),
        (-10, 34, -22.5),
        (10, 34, -22.5),
    ]]
    fillet(redondeo10_edges, radius=REDONDEO10_R)


with BuildPart() as body_4:
    # Croquis22 → Saliente-Extruir15 (new body)
    with BuildSketch(Plane.XY.offset(23)):
        with Locations((0, 44)):
            Circle(CROQUIS22_R)
    extrude(amount=-SALIENTE_EXTRUIR15_DEPTH)

    # Croquis23 → Saliente-Extruir16 (add)
    with BuildSketch(Plane.XY.offset(23)):
        with Locations((0, 44)):
            Circle(CROQUIS23_R)
    extrude(amount=SALIENTE_EXTRUIR16_DEPTH)


solid = Compound([part.part, body_2.part, body_3.part, body_4.part])
